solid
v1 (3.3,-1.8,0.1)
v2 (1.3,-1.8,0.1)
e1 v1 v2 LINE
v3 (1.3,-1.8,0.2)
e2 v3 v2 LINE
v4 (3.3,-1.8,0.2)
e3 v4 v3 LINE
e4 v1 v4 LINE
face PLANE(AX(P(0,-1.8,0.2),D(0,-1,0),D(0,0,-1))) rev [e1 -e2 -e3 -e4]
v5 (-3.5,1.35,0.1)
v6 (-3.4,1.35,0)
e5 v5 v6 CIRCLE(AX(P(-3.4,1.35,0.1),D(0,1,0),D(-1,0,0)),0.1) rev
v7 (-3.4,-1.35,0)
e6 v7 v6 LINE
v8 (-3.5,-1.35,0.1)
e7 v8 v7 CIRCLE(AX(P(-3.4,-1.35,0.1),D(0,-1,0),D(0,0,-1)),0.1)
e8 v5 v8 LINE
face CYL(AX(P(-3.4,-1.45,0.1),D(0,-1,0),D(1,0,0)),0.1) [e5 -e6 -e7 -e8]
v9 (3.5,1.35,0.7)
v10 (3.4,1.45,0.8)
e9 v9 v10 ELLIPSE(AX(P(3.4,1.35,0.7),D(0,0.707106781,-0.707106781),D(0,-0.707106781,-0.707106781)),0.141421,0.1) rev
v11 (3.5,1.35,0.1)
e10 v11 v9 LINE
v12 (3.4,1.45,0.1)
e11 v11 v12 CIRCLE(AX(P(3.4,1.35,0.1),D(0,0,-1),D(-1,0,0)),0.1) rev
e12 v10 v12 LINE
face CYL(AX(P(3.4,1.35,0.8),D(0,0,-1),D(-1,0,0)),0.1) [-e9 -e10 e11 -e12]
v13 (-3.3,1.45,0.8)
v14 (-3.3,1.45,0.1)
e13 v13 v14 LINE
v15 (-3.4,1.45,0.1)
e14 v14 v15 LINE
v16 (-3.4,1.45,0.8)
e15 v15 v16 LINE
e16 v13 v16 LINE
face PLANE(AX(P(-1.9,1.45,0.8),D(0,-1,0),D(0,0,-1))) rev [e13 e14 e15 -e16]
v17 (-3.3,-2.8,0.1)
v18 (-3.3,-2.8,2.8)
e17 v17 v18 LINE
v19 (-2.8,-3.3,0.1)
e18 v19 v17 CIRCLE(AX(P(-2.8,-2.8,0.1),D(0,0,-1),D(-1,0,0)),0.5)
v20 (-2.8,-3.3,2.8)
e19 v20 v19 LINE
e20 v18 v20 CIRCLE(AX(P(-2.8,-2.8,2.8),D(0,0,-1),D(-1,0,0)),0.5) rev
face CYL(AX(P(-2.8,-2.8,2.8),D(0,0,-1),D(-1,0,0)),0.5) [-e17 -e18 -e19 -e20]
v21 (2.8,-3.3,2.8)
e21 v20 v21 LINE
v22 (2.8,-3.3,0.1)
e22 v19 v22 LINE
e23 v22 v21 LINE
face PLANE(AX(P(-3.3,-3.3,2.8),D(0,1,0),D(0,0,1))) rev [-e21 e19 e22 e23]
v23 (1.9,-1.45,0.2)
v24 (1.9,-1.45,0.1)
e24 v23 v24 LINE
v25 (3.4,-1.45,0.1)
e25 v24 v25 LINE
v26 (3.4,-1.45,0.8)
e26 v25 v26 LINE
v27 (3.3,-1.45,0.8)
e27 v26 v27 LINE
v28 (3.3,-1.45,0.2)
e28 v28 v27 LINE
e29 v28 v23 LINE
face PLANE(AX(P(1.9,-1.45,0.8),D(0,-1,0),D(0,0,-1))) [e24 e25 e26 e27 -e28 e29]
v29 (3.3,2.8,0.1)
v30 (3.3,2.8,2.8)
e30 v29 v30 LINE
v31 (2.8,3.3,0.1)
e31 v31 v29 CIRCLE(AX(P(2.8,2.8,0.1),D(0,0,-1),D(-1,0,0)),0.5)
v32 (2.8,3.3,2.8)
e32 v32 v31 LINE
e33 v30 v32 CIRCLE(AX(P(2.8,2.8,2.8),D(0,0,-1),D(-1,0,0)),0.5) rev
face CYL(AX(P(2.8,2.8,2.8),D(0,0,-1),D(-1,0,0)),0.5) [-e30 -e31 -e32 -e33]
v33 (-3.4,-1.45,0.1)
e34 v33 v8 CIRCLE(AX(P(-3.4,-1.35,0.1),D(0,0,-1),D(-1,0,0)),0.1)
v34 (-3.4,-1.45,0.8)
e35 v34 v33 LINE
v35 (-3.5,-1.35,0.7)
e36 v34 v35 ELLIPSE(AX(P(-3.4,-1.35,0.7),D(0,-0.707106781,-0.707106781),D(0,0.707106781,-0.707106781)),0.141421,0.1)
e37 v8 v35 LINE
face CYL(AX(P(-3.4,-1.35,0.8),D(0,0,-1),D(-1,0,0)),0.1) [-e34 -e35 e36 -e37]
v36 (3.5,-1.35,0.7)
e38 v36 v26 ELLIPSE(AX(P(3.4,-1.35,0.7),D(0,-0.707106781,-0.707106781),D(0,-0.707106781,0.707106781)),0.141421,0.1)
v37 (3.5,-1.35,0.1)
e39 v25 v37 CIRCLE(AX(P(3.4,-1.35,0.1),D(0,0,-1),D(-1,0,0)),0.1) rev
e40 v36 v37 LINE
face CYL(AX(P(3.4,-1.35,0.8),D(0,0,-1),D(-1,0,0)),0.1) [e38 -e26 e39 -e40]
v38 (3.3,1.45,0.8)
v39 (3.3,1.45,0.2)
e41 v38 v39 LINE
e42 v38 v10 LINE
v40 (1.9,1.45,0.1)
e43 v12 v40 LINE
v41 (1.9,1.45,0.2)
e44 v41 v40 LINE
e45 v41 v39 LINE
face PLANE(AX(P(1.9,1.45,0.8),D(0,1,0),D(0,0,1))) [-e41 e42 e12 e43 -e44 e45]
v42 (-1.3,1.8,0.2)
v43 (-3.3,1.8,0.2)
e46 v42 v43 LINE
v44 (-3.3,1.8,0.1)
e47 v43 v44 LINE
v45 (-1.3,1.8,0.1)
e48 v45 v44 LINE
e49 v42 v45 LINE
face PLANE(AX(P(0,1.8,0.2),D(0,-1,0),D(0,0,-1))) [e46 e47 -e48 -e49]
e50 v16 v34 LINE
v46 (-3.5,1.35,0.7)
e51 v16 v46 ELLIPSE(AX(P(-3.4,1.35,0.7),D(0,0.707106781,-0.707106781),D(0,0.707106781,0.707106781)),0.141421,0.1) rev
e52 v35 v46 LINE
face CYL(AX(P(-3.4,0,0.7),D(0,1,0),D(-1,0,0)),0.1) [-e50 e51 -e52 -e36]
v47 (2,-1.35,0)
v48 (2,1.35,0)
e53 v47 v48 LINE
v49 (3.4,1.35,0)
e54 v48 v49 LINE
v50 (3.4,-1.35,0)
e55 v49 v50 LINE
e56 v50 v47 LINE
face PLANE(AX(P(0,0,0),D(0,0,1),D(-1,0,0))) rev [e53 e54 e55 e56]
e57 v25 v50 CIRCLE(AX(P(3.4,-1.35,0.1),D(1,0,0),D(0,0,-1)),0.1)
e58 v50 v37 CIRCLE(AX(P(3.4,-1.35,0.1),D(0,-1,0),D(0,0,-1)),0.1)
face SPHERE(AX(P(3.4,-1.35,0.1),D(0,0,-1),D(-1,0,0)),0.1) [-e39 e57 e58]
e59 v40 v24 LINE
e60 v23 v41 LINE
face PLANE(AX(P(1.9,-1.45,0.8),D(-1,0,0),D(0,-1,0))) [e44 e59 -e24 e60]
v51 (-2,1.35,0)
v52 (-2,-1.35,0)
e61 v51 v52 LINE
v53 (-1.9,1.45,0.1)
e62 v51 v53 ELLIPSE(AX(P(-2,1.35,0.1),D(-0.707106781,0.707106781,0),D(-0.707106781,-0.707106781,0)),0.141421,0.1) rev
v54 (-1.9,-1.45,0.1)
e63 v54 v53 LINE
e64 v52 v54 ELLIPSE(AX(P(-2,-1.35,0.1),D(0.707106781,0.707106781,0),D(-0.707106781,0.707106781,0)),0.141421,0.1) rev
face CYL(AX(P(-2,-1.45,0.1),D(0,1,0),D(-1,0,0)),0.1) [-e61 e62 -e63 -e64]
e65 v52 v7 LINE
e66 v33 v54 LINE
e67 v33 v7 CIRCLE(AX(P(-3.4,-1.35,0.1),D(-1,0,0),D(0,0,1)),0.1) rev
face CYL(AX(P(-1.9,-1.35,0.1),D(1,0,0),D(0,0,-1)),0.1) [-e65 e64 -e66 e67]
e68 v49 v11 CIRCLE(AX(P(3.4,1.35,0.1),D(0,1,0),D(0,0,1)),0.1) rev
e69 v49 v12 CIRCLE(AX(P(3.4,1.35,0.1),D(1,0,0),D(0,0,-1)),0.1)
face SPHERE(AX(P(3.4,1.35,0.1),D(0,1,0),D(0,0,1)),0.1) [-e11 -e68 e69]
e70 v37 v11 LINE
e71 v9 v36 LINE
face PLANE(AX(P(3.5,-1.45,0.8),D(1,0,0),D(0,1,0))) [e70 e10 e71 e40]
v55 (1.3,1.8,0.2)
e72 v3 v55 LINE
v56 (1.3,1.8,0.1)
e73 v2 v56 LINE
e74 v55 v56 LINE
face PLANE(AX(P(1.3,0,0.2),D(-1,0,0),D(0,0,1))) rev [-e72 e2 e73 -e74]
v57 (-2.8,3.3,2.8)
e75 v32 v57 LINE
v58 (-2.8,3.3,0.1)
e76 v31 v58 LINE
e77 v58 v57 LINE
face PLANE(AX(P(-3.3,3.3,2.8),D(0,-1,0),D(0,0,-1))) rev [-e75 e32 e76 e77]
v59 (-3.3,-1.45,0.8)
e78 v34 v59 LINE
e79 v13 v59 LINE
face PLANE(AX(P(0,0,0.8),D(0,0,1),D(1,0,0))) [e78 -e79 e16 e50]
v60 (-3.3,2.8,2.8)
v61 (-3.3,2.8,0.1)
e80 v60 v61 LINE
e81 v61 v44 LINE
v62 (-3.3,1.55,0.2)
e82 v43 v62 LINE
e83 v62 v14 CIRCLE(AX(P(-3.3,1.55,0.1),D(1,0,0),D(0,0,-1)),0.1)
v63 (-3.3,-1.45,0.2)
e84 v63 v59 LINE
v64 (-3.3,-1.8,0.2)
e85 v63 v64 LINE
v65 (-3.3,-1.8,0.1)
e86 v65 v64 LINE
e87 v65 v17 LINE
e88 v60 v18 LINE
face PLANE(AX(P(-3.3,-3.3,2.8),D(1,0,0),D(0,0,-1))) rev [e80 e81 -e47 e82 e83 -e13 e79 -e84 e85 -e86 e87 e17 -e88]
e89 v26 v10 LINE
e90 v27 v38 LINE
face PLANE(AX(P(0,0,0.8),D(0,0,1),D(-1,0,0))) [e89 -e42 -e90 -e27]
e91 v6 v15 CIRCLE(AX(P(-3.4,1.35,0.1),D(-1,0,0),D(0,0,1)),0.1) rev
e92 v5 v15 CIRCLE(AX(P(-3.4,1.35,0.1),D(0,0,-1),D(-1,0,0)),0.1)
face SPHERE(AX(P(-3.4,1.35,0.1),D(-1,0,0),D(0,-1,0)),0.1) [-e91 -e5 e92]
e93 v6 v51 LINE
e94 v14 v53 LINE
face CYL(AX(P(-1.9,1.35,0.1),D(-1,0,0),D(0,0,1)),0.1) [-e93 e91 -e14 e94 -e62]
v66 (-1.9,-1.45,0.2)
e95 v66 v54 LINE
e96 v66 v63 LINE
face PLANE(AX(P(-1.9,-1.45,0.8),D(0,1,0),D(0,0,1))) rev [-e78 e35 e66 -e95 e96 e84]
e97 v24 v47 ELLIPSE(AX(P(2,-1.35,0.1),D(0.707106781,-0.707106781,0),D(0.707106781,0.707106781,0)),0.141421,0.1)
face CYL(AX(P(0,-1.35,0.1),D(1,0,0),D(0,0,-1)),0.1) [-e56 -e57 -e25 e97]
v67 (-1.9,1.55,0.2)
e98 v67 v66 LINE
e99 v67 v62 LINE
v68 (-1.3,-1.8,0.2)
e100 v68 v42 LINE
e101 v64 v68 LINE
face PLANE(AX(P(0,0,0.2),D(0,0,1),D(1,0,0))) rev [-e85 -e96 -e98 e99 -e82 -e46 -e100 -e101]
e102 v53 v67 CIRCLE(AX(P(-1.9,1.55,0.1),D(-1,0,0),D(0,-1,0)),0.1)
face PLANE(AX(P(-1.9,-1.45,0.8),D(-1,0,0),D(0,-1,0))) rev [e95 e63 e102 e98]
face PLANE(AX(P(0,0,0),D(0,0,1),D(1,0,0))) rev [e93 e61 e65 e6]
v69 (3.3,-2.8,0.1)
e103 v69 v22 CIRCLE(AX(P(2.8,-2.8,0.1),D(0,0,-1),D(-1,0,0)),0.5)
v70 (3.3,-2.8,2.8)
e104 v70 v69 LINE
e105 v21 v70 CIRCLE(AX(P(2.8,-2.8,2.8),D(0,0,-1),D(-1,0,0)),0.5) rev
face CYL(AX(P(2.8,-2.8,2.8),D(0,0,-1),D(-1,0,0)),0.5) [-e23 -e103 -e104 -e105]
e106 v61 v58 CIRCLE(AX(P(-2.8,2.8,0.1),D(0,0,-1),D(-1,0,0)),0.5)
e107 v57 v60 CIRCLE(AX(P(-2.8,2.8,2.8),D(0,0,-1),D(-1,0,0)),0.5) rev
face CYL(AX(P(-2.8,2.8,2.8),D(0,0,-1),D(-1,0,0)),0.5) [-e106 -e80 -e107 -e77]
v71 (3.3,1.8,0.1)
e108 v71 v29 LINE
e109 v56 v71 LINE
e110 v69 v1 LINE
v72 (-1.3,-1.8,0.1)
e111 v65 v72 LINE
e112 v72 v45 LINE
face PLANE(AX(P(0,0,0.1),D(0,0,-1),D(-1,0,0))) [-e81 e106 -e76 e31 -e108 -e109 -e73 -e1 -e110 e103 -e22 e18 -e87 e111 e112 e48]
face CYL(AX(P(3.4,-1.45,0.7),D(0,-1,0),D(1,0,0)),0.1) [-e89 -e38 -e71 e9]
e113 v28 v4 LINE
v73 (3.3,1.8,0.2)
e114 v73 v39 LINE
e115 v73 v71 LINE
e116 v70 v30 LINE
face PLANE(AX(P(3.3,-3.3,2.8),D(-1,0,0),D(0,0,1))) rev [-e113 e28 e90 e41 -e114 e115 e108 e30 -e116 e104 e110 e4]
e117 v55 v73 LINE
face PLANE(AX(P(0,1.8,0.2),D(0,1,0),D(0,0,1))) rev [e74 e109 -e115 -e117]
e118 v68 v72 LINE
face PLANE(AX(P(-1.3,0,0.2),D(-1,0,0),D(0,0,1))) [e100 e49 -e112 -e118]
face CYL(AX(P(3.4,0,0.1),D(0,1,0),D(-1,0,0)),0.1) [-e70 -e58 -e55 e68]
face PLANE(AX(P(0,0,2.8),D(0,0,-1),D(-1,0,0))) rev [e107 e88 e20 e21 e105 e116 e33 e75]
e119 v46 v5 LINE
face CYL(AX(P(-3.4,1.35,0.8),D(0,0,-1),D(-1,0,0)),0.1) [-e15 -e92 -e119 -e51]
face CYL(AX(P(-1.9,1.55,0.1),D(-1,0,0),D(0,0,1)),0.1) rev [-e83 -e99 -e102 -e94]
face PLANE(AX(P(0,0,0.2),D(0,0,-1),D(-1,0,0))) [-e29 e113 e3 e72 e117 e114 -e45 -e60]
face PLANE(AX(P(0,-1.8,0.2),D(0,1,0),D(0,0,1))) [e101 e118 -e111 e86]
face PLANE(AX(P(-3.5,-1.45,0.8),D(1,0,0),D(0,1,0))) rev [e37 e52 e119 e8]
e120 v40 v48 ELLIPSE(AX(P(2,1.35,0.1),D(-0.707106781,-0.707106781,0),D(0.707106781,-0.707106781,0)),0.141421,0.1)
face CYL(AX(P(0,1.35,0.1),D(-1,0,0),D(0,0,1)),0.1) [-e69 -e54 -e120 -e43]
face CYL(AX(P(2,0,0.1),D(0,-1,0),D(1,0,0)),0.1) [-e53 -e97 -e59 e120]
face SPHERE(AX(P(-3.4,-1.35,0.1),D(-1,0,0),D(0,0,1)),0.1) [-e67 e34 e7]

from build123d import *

# Parameters (mm, degrees)
BOSS_EXTRUDE1_START = 0.1
SKETCH1_W           = 6.6
SKETCH1_H           = 6.6
BOSS_EXTRUDE1_DEPTH = 2.7
CUT_EXTRUDE1_START  = 0.1
SKETCH2_W           = 4
SKETCH2_H           = 3.6
CUT_EXTRUDE1_DEPTH  = 0.1
SKETCH3_W           = 1.6
SKETCH3_H           = 2.9
BOSS_EXTRUDE2_DEPTH = 0.8
FILLET1_R           = 0.5
FILLET2_R           = 0.1


with BuildPart() as part:
    # Sketch1 → Boss-Extrude1 (new body)
    with BuildSketch(Plane.XY.offset(BOSS_EXTRUDE1_START)):
        Rectangle(SKETCH1_W, SKETCH1_H)
    extrude(amount=BOSS_EXTRUDE1_DEPTH)

    # Sketch2 → Cut-Extrude1 (cut)
    with BuildSketch(Plane.XY.offset(CUT_EXTRUDE1_START)):
        with Locations((-3.3, 0)):
            Rectangle(SKETCH2_W, SKETCH2_H)
    cut_extrude1 = extrude(amount=CUT_EXTRUDE1_DEPTH, mode=Mode.SUBTRACT)

    # Mirror1: Cut-Extrude1 across plane
    add(cut_extrude1.mirror(Plane(origin=(0, 0, 0), x_dir=(0, 0, 1), z_dir=(1, 0, 0))), mode=Mode.SUBTRACT)

    # Sketch3 → Boss-Extrude2 (add)
    with BuildSketch(Plane.XY):
        with Locations((-2.7, 0)):
            Rectangle(SKETCH3_W, SKETCH3_H)
    boss_extrude2 = extrude(amount=BOSS_EXTRUDE2_DEPTH)

    # Mirror2: Boss-Extrude2 across plane
    add(boss_extrude2.mirror(Plane(origin=(0, 0, 0), x_dir=(0, 0, 1), z_dir=(1, 0, 0))))

    # Fillet1
    fillet1_edges = [part.edges().sort_by_distance(p)[0] for p in [
        (3.3, -3.3, 1.45),
        (-3.3, -3.3, 1.45),
        (-3.3, 3.3, 1.45),
        (3.3, 3.3, 1.45),
    ]]
    fillet(fillet1_edges, radius=FILLET1_R)

    # Fillet2
    fillet2_edges = [part.edges().sort_by_distance(p)[0] for p in [
        (3.5, -1.45, 0.4),
        (3.5, 0, 0.8),
        (3.5, 1.45, 0.4),
        (2.7, 1.45, 0),
        (1.9, 0, 0),
        (2.7, -1.45, 0),
        (3.5, 0, 0),
        (-2.7, -1.45, 0),
        (-1.9, 0, 0),
        (-2.7, 1.45, 0),
        (-3.5, 1.45, 0.4),
        (-3.5, 0, 0.8),
        (-3.5, -1.45, 0.4),
        (-3.5, 0, 0),
        (-2.6, 1.45, 0.2),
    ]]
    fillet(fillet2_edges, radius=FILLET2_R - 0.0001)  # a hair under: the kernel refuses the full size


solid = part.part
